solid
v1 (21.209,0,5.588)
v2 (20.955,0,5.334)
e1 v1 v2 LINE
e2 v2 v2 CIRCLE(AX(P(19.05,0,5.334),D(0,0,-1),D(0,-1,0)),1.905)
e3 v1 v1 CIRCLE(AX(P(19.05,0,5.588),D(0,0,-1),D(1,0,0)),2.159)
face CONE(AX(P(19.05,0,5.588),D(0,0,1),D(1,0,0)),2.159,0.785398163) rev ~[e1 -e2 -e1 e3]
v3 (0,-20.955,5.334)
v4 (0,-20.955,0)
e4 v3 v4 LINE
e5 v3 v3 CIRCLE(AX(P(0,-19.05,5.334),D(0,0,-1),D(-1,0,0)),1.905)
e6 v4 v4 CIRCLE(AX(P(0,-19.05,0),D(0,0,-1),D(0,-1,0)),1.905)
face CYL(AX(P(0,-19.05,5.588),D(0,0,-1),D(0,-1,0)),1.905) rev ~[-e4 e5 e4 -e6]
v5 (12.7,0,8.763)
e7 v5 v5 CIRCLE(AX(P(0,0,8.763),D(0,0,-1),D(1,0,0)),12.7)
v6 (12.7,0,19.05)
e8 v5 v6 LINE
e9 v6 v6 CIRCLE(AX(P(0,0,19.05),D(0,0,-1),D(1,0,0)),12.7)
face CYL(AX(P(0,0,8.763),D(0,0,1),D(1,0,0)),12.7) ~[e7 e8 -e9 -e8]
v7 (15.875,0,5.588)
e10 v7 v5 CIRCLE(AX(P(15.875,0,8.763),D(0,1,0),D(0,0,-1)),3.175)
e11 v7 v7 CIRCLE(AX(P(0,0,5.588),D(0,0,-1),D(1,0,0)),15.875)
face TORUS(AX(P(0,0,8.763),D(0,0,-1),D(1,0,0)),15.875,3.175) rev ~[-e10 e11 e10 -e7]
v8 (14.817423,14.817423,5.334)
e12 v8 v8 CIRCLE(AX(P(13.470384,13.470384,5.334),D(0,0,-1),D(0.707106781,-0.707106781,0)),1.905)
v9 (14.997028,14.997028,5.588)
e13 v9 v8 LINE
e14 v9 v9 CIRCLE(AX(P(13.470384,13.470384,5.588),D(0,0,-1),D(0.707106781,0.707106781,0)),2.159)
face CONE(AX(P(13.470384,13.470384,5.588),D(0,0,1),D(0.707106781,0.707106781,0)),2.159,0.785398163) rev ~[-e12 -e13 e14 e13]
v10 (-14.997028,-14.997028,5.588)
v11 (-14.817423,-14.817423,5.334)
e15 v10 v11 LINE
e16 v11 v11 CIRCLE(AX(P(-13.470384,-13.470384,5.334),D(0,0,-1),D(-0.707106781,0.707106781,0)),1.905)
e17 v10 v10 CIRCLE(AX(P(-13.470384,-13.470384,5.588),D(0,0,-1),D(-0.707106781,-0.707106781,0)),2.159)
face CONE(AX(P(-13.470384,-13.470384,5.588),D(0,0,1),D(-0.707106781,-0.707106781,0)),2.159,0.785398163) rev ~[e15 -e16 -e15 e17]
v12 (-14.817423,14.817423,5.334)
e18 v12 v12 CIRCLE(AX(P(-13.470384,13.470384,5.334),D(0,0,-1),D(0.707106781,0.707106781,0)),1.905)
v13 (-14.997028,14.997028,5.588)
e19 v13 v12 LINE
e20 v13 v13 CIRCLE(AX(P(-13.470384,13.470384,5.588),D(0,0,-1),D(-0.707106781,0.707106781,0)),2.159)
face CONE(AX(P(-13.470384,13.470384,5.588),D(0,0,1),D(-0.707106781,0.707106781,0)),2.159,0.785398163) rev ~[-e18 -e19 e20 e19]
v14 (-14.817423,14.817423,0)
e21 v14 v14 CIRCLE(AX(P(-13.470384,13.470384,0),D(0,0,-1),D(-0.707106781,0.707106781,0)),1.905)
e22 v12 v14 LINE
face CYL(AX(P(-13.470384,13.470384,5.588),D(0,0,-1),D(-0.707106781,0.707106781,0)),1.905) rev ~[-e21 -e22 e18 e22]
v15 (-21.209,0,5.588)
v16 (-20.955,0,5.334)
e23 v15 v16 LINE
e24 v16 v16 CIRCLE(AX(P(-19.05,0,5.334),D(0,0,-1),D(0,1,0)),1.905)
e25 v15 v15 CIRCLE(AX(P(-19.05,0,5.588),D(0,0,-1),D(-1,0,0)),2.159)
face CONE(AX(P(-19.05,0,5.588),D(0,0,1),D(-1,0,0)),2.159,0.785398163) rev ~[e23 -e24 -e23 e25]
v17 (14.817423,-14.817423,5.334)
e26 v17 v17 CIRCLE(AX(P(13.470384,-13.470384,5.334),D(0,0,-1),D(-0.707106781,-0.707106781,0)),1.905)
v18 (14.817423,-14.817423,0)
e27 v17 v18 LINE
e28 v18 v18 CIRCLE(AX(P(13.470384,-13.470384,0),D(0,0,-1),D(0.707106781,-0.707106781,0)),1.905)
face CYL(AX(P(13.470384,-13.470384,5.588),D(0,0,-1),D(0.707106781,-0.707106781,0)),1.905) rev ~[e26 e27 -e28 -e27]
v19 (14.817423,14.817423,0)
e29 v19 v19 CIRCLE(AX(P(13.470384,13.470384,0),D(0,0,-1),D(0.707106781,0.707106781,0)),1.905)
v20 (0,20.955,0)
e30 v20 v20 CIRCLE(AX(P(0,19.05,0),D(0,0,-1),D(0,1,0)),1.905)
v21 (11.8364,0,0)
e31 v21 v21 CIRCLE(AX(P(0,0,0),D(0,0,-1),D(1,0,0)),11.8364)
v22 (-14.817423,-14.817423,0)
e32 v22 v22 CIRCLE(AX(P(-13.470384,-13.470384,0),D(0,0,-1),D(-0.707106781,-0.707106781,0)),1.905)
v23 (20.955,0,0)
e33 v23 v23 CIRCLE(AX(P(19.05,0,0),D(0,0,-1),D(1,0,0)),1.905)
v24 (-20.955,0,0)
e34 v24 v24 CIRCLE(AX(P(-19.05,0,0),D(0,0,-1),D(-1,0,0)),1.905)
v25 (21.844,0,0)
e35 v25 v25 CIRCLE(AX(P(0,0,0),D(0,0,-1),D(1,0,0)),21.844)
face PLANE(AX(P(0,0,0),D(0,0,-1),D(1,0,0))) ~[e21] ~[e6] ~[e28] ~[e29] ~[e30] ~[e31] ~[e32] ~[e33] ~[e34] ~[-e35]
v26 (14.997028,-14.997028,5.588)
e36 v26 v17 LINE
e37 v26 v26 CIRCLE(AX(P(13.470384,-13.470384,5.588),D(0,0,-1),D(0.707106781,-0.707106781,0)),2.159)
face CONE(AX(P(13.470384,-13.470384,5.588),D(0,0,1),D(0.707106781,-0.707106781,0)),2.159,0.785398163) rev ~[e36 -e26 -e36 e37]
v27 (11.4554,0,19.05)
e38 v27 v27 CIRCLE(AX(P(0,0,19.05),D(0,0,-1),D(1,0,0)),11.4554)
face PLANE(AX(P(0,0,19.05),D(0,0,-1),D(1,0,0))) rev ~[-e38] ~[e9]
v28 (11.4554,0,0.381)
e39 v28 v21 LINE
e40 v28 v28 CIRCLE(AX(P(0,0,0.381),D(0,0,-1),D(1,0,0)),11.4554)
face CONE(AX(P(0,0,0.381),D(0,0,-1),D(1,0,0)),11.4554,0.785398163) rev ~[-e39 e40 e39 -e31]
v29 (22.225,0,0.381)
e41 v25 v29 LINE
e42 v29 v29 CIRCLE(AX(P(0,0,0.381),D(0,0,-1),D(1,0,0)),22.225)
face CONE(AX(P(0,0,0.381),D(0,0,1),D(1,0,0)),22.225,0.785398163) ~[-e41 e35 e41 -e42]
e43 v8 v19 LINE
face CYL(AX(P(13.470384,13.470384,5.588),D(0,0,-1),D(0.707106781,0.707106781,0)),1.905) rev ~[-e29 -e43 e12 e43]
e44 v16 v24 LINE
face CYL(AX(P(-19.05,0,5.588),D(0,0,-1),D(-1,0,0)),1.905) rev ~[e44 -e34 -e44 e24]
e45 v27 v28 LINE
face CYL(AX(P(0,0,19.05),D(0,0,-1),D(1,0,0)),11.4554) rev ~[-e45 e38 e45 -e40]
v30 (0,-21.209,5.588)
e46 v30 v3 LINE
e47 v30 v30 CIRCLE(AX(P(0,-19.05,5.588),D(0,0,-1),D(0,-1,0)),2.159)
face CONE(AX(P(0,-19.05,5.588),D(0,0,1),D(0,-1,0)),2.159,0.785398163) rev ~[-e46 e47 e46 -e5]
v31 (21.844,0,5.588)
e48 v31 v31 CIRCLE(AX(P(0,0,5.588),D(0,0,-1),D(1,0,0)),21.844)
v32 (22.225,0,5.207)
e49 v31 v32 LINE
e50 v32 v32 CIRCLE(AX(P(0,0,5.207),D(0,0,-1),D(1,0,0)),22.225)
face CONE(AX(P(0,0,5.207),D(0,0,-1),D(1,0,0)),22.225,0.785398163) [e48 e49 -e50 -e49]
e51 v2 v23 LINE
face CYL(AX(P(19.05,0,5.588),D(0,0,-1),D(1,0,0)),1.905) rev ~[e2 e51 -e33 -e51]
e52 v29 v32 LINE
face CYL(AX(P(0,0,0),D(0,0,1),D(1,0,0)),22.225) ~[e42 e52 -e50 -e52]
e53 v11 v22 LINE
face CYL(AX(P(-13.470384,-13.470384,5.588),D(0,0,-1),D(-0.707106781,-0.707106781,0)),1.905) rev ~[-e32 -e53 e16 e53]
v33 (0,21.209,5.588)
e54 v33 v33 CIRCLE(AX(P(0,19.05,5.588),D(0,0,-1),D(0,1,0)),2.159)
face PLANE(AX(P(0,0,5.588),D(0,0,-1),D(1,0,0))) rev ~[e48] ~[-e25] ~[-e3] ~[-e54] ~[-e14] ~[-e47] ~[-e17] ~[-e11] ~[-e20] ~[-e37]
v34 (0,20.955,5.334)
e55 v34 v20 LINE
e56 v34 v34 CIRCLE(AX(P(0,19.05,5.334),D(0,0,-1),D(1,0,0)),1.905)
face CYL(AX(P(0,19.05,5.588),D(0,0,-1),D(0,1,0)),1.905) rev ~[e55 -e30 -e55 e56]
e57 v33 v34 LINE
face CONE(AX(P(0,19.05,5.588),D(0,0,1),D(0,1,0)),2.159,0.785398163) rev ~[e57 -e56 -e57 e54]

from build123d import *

# Parameters (mm, degrees)
F3_D            = 3.81
F3_CSINK_D      = 4.318
F3_CSINK_ANGLE  = 90
F3_COPIES_COUNT = 8
F4_SIZE2        = 0.381
F4_SIZE         = 0.381


# Not quite as in the source:
# - a pattern or mirror of a feature is missing from the dataset's text; its kind, count and spacing are read off the source's solid


with BuildPart() as f1:
    # F0 (on Front) → F1 (revolve)
    with BuildSketch(Plane.XZ):
        with BuildLine():
            Line((12.7, 19.05), (11.4554, 19.05))
            Line((11.4554, 19.05), (11.4554, 0))
            Line((11.4554, 0), (22.225, 0))
            Line((22.225, 0), (22.225, 5.588))
            Line((22.225, 5.588), (15.875, 5.588))
            ThreePointArc((15.875, 5.588), (13.6299359697, 6.5179359697), (12.7, 8.763))
            Line((12.7, 8.763), (12.7, 19.05))
        make_face()
    revolve(axis=Axis((0, 0, -8.7907983398), (0, 0, -1)))

    # F3 (through all)
    with Locations(Plane.XY.offset(5.588)):
        with Locations((-19.05, 0)):
            f3 = CounterSinkHole(F3_D / 2, F3_CSINK_D / 2, counter_sink_angle=F3_CSINK_ANGLE)

    # F3_copies: F3 ×8 about axis
    f3_copies_axis = Axis((0, 0, 0), (0, 0, 1))
    for i in range(1, F3_COPIES_COUNT):
        add(f3.rotate(f3_copies_axis, i * 360 / F3_COPIES_COUNT), mode=Mode.SUBTRACT)

    # F4
    f4_edges = [f1.edges().sort_by_distance(p)[0] for p in [
        (-22.225, 0, 5.588),
        (-22.225, 0, 0),
        (-11.4554, 0, 0),
    ]]
    chamfer(f4_edges, length=F4_SIZE, length2=F4_SIZE2)


solid = f1.part
